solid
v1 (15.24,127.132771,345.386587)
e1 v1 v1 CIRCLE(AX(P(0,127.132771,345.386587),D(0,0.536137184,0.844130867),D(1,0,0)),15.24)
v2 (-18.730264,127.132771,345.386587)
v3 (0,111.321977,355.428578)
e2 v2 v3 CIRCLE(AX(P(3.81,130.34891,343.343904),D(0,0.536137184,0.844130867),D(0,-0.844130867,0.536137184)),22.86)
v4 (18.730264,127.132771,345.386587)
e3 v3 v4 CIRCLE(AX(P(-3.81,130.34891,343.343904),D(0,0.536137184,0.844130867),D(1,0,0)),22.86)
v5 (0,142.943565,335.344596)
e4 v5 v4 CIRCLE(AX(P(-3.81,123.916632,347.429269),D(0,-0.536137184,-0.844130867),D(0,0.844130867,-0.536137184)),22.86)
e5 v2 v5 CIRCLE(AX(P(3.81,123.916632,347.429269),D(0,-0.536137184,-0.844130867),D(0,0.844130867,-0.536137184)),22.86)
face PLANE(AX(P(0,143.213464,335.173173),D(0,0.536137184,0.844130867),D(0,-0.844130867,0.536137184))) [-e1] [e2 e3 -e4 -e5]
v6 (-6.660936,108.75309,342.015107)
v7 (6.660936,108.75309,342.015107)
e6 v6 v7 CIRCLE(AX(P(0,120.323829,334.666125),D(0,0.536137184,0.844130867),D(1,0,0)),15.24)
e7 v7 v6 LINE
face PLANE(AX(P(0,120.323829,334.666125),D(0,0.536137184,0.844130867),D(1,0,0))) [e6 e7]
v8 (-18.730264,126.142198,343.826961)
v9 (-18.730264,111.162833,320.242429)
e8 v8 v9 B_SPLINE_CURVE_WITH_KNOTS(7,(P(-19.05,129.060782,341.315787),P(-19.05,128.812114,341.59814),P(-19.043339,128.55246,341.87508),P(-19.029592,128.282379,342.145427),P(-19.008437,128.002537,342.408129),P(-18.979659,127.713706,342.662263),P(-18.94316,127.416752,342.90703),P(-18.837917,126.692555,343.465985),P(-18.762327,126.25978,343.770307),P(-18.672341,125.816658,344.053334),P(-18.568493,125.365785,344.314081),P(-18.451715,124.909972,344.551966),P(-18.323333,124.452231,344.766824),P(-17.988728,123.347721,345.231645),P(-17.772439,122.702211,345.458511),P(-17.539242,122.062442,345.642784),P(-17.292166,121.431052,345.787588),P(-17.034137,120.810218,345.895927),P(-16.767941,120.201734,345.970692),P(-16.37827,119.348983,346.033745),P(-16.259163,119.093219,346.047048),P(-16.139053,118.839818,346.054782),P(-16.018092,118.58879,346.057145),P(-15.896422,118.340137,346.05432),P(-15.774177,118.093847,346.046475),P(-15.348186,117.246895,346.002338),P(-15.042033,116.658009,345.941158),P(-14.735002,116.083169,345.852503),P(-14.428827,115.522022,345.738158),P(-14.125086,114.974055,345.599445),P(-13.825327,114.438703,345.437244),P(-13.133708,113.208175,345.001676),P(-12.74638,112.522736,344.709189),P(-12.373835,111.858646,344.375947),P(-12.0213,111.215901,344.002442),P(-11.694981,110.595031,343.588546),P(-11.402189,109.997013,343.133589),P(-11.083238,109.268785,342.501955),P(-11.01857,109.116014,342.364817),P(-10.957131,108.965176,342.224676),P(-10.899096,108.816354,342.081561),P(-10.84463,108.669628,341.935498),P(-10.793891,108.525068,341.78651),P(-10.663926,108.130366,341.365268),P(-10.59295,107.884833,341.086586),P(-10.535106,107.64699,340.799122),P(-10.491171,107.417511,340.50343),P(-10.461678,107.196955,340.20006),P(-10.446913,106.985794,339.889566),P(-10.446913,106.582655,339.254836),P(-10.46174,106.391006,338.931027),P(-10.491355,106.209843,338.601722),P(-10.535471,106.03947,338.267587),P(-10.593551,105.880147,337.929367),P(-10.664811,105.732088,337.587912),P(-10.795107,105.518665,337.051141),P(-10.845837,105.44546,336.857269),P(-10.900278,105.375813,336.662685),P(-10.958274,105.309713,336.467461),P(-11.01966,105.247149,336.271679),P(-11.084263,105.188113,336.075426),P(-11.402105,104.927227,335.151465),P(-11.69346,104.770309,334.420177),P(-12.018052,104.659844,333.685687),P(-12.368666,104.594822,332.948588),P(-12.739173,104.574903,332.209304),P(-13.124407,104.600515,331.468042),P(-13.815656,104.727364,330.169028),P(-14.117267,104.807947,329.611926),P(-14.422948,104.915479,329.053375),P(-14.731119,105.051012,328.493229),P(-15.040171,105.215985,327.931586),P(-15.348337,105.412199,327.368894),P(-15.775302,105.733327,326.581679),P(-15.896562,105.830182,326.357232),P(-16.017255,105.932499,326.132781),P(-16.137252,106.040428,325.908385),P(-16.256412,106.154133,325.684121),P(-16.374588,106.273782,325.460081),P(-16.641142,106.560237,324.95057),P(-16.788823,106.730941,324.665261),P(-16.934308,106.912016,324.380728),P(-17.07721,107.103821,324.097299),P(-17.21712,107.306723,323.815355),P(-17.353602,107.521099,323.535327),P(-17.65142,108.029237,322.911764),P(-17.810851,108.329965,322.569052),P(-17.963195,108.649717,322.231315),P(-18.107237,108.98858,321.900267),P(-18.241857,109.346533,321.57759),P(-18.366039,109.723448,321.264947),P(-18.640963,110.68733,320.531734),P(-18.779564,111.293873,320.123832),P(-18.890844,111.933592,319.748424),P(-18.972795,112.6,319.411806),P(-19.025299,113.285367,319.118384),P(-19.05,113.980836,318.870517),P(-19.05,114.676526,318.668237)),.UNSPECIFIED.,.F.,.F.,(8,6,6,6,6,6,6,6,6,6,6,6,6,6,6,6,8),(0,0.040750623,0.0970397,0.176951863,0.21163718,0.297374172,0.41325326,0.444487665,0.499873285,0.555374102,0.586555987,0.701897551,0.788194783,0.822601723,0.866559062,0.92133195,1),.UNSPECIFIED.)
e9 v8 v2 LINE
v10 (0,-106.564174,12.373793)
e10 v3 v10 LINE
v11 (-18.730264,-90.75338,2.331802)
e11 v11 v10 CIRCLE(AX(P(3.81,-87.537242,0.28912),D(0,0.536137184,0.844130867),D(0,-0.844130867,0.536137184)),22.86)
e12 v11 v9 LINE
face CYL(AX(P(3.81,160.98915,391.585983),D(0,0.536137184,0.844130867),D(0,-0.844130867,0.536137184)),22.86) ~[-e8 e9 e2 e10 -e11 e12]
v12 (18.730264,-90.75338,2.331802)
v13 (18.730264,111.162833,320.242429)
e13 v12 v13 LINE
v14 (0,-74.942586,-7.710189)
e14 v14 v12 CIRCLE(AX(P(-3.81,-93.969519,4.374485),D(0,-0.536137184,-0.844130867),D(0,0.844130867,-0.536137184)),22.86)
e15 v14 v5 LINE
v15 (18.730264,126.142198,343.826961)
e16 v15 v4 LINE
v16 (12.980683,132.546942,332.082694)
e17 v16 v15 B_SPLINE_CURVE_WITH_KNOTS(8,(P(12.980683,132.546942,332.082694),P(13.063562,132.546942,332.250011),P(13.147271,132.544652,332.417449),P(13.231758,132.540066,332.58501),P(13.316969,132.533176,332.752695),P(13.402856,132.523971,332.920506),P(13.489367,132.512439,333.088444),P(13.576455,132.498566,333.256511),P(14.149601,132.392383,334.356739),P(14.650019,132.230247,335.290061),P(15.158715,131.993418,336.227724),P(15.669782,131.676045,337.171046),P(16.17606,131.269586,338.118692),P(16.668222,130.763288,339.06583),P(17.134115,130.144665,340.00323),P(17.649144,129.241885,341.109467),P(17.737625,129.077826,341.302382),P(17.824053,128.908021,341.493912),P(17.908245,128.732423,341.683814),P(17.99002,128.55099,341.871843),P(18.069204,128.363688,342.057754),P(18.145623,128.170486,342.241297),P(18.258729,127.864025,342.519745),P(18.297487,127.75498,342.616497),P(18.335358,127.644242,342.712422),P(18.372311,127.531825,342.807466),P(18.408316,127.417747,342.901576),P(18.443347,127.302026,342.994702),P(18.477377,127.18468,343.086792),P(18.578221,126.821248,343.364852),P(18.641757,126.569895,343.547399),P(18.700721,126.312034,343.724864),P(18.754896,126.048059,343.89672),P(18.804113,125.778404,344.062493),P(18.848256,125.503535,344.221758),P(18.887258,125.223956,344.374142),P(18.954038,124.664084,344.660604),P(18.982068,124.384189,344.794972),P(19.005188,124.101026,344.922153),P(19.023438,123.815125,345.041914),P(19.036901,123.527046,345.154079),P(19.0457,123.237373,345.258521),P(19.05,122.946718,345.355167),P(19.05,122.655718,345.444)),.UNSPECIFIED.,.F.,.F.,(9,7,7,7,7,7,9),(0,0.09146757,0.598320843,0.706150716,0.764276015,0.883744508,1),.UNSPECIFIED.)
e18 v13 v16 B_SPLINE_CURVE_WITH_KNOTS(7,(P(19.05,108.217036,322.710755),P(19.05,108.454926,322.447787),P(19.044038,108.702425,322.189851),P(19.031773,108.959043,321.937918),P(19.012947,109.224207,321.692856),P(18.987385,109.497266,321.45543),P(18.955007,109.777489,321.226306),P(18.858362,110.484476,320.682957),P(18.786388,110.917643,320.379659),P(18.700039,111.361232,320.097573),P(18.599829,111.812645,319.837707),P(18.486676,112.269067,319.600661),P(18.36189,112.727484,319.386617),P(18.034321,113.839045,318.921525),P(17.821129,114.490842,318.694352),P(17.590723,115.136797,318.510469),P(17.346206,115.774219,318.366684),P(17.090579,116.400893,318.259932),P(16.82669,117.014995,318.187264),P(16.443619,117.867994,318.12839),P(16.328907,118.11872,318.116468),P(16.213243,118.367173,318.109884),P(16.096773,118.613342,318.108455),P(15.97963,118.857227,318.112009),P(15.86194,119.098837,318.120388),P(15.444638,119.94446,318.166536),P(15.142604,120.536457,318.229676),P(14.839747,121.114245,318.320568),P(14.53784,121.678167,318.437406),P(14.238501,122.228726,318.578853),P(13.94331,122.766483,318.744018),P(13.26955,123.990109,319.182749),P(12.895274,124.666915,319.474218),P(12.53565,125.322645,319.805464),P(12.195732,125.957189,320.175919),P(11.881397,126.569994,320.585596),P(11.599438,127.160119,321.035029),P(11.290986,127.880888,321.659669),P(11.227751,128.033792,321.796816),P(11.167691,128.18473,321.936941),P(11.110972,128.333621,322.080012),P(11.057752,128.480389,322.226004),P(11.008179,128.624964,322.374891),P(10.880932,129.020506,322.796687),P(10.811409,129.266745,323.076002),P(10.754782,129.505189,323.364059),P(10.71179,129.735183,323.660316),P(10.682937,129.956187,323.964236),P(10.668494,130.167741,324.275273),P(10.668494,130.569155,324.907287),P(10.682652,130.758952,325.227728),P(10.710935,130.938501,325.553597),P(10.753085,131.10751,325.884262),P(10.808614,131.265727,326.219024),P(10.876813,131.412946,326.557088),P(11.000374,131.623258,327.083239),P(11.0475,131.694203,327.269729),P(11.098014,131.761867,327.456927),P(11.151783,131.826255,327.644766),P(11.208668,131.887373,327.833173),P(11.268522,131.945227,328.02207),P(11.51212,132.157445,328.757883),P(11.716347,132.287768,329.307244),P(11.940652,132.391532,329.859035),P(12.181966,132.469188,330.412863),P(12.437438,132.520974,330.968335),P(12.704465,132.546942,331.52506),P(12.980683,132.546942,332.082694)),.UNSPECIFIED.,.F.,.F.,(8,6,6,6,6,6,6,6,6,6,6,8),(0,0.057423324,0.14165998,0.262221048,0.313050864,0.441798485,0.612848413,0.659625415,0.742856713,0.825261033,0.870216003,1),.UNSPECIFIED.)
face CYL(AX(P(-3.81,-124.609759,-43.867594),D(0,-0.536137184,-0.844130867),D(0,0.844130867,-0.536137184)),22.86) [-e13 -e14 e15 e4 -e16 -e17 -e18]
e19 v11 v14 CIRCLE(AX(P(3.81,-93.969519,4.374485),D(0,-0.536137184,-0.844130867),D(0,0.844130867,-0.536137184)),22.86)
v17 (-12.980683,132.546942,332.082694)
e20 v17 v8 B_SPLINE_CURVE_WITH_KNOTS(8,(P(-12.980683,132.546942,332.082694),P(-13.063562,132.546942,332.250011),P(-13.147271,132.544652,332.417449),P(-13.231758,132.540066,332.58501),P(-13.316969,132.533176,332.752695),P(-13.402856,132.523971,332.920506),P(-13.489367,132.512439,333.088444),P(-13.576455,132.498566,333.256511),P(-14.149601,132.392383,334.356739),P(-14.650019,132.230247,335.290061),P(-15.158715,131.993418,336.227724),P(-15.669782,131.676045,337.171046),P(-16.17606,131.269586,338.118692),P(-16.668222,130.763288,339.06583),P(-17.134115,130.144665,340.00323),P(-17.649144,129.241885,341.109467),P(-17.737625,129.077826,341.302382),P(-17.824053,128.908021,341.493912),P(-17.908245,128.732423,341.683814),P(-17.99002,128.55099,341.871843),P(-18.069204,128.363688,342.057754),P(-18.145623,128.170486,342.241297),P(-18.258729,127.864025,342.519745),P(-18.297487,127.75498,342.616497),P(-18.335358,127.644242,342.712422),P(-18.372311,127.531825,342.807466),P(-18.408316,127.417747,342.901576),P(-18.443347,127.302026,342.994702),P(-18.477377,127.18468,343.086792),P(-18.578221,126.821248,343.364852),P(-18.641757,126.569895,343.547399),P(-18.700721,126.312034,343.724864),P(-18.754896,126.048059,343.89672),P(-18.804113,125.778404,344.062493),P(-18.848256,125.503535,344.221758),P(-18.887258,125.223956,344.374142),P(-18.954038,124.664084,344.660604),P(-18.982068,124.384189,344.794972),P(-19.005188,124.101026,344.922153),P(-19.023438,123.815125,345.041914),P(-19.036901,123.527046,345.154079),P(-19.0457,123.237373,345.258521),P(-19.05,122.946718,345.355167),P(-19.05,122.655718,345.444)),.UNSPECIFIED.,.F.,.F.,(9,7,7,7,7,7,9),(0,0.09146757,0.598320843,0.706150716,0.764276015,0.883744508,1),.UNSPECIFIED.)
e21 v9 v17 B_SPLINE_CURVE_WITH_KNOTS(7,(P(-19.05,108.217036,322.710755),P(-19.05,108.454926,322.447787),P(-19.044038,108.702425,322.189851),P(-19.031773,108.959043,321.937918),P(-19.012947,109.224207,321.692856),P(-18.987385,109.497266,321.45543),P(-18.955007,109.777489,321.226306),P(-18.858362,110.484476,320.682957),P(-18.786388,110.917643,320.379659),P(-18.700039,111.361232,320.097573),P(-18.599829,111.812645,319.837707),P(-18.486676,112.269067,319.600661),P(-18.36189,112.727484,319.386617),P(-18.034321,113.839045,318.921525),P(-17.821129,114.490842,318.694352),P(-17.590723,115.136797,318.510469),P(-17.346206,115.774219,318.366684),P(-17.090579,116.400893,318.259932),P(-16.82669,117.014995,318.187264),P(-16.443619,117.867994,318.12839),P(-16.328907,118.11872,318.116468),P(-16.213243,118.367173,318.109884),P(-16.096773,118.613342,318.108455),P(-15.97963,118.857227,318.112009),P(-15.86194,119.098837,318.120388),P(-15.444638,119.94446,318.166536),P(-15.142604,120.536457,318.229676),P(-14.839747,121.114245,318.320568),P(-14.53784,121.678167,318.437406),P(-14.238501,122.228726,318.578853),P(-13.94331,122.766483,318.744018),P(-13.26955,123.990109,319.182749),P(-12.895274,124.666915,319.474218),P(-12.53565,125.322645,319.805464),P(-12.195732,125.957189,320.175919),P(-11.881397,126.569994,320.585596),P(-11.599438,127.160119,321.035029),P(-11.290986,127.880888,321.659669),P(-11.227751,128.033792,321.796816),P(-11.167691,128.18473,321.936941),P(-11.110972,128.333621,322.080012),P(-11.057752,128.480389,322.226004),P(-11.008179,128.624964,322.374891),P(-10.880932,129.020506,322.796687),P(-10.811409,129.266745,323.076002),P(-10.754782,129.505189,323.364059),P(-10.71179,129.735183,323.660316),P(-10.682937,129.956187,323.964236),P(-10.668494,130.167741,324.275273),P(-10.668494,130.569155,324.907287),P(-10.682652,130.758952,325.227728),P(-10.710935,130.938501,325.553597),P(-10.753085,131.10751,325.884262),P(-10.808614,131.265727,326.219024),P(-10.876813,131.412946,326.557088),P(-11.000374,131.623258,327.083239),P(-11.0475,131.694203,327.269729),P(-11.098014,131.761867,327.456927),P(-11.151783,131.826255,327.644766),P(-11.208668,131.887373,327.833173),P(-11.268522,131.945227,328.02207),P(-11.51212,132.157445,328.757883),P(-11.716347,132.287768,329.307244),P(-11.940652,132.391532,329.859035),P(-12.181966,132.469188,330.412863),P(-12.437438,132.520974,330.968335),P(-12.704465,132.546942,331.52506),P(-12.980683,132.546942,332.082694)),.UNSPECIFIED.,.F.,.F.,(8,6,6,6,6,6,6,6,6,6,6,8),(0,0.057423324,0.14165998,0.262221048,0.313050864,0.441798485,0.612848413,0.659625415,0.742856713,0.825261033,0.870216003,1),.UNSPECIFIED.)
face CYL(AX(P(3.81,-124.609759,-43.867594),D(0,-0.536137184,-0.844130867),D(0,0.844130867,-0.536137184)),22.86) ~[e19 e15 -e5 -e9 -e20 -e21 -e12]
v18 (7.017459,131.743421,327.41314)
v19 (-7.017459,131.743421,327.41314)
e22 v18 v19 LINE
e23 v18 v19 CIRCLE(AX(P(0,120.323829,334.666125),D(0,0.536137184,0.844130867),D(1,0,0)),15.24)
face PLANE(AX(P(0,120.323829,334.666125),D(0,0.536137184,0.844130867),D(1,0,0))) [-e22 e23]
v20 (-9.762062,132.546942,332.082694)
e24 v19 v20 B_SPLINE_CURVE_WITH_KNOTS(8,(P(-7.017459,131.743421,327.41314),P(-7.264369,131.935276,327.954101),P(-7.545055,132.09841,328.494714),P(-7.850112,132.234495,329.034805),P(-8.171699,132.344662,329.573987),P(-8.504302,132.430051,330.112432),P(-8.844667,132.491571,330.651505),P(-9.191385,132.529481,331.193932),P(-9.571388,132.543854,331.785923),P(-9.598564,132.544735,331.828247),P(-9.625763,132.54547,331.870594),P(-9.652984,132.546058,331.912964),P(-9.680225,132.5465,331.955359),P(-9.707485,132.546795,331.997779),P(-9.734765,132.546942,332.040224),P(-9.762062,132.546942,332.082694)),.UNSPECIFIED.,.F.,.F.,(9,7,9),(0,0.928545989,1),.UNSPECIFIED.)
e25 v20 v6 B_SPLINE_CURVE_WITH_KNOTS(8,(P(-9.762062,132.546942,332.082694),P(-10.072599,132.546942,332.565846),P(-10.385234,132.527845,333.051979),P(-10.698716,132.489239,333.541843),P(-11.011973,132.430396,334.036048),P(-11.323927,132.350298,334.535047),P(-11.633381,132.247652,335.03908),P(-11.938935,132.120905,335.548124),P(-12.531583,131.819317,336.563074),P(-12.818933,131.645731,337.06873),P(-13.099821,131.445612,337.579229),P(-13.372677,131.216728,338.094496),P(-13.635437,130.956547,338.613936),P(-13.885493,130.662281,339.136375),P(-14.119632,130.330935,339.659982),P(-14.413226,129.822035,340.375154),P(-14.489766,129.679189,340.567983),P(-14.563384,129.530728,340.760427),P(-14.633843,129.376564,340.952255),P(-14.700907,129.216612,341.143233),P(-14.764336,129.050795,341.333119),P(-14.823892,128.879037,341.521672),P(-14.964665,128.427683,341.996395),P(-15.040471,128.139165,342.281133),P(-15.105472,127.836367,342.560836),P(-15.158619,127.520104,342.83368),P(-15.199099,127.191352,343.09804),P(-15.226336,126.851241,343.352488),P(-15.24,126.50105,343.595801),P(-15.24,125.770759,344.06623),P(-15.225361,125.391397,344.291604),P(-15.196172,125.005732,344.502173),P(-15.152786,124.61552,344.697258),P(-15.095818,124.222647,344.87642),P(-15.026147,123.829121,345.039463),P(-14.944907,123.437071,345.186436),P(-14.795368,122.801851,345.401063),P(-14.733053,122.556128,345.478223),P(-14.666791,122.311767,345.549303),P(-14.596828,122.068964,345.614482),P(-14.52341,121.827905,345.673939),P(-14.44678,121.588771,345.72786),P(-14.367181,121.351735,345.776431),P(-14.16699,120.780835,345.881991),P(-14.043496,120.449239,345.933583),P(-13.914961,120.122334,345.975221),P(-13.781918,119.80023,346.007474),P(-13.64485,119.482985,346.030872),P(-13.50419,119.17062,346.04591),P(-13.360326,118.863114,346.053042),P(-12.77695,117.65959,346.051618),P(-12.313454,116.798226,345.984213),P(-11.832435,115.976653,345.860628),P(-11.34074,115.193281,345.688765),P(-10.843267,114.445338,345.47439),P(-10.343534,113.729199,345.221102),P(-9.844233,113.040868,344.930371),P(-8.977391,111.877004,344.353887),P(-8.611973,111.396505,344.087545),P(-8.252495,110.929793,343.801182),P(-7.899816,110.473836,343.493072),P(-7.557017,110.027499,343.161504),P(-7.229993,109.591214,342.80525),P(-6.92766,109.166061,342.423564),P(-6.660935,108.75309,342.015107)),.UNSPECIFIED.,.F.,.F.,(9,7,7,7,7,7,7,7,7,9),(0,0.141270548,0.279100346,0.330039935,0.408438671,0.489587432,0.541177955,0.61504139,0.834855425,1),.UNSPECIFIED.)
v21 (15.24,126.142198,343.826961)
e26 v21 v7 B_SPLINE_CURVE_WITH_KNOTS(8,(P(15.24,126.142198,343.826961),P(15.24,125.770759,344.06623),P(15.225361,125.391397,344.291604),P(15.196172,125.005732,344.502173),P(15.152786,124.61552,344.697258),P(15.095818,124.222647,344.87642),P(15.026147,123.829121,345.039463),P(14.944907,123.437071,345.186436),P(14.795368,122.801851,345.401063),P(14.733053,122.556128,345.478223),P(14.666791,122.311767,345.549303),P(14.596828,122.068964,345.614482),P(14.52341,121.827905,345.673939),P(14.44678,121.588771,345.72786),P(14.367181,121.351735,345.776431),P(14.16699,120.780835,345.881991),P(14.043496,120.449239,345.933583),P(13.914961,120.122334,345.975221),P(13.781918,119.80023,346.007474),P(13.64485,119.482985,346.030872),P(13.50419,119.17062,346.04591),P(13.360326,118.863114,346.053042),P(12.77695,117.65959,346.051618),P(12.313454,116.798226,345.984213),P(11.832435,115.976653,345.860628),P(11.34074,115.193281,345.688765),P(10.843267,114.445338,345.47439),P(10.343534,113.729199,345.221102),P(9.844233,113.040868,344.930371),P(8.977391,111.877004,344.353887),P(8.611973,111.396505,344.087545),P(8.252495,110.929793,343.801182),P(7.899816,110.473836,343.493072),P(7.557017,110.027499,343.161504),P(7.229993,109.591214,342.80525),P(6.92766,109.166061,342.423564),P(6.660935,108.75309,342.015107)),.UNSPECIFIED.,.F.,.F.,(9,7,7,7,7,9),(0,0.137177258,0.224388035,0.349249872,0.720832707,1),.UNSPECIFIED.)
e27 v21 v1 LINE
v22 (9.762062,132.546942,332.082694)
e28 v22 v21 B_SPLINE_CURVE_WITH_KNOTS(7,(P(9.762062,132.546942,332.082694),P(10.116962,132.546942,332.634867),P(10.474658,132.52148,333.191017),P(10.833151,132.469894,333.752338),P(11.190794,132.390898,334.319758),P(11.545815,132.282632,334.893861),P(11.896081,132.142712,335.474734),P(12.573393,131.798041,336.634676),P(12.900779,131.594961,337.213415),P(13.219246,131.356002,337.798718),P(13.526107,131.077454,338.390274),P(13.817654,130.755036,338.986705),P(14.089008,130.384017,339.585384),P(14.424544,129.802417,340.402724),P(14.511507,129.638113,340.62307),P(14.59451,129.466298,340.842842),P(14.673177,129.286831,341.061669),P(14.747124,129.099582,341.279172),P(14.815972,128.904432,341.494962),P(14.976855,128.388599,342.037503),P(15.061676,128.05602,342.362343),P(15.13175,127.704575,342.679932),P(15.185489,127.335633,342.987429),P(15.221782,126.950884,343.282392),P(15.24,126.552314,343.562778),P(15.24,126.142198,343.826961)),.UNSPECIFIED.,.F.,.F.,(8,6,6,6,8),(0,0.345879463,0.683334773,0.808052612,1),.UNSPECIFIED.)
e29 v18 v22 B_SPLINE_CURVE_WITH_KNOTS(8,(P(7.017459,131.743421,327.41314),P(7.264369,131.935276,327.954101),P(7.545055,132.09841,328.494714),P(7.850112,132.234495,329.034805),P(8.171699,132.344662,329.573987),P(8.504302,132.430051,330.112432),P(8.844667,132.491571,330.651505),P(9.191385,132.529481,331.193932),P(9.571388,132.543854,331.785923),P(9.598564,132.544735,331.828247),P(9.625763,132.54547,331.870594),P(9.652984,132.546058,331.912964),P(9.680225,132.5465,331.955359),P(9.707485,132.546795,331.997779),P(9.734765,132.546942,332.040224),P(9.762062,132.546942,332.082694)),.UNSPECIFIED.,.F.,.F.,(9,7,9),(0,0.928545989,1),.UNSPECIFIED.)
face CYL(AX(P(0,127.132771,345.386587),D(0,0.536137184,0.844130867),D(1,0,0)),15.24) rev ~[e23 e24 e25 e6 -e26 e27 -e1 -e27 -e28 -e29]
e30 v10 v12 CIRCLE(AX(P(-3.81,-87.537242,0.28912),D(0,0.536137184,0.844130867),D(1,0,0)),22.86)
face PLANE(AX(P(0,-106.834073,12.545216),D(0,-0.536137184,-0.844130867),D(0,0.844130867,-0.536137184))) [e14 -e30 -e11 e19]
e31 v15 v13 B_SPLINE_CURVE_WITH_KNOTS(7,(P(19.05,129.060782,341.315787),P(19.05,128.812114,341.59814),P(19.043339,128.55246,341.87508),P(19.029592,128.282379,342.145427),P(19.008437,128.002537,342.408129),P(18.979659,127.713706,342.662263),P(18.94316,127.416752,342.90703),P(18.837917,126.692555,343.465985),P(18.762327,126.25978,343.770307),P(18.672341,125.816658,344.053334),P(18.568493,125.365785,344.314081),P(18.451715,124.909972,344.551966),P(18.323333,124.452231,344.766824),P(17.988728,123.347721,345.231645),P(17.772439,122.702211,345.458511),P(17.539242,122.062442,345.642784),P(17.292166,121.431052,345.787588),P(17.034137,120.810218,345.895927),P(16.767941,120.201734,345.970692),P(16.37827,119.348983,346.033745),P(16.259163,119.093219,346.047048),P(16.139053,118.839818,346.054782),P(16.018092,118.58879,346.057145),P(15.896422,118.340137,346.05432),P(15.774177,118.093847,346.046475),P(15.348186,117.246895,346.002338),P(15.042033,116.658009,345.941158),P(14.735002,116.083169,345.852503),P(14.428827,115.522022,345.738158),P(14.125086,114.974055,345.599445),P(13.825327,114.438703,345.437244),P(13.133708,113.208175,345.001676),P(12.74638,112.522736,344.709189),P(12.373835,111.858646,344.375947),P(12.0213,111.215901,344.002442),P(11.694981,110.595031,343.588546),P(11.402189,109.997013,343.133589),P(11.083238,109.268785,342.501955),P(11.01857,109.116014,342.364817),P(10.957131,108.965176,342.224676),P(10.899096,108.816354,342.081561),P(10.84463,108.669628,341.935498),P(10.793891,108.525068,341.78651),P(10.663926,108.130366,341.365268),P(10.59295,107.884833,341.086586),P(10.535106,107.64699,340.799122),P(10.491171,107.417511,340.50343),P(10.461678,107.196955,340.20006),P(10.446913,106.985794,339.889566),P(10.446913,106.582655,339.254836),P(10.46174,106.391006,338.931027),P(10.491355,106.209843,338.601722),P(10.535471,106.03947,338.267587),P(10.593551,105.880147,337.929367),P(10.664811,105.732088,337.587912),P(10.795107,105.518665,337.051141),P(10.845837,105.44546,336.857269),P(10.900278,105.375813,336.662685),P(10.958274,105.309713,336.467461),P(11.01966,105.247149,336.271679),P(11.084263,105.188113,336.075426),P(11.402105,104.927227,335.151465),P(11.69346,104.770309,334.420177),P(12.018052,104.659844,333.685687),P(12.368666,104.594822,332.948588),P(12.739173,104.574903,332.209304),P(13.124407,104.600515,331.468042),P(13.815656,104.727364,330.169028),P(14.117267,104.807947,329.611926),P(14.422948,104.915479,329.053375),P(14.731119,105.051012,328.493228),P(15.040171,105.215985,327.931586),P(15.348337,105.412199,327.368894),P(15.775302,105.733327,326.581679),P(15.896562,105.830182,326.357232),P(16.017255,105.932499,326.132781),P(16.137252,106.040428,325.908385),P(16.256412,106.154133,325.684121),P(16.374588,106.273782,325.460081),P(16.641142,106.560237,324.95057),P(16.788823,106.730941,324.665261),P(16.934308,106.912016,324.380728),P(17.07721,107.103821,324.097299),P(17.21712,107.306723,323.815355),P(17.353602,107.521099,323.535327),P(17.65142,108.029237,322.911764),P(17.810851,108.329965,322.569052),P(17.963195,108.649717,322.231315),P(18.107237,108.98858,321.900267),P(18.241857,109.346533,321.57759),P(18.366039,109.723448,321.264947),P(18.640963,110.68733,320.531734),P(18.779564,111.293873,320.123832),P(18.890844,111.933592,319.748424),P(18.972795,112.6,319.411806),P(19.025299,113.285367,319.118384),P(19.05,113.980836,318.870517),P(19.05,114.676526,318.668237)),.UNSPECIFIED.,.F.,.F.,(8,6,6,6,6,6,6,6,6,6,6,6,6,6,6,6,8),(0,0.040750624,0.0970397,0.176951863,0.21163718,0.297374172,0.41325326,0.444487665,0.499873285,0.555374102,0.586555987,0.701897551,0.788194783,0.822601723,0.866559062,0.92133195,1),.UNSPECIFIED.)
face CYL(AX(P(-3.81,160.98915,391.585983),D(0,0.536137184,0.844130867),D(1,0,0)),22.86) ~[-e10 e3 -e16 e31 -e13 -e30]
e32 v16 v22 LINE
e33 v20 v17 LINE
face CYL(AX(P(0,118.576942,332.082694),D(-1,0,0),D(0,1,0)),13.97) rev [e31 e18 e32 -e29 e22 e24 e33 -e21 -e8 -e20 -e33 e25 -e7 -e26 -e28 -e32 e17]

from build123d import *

# Parameters (mm, degrees)
F0_R        = 13.97
F1_DEPTH    = 19.05
F2_T1_DEPTH = 520.7
F2_T3_DEPTH = 520.7
F3_R        = 15.24
F4_DEPTH    = 12.7


# Not quite as in the source:
# - a fillet or chamfer that OpenCascade refuses, or shapes differently, is made with other operations: its cross-section is extruded or revolved along the edge and cut away or added


with BuildPart() as f1:
    # F0 (on Right) → F1 (new body, symmetric)
    with BuildSketch(Plane.YZ):
        Polygon((143.2134641072, 335.1731732972), (111.0520780853, 355.6), (-106.8340734116, 12.545215766), (-74.6726873897, -7.8816109369), align=None)
        with Locations((118.576942247, 332.0826940597)):
            Circle(F0_R, mode=Mode.SUBTRACT)
    extrude(amount=F1_DEPTH, both=True)

    # F2: fillet of radius 22.86 on 4 edges, made by hand

    # F2_s2 → F2_t1 (cut)
    with BuildSketch(Plane(origin=(0, 223.4952640736, 351.8861527791), x_dir=(1, 0, 0), z_dir=(0, -0.5361371838, -0.8441308667))):
        with BuildLine():
            ThreePointArc((19.05, 74.0478956349), (12.3544610179, 90.2123566528), (-3.81, 96.9078956349))
            Line((-3.81, 96.9078956349), (19.05, 96.9078956349))
            Line((19.05, 96.9078956349), (19.05, 74.0478956349))
        make_face()
        with BuildLine():
            ThreePointArc((3.81, 96.9078956349), (-12.3544610179, 90.2123566528), (-19.05, 74.0478956349))
            Line((-19.05, 74.0478956349), (-19.05, 96.9078956349))
            Line((-19.05, 96.9078956349), (3.81, 96.9078956349))
        make_face()
    extrude(amount=F2_T1_DEPTH, mode=Mode.SUBTRACT)

    # F2_s4 → F2_t3 (cut)
    with BuildSketch(Plane(origin=(0, -55.6713675318, -87.6527895208), x_dir=(1, 0, 0), z_dir=(0, 0.5361371838, 0.8441308667))):
        with BuildLine():
            ThreePointArc((-3.81, -58.8078956349), (12.3544610179, -65.5034346169), (19.05, -81.6678956349))
            Line((19.05, -81.6678956349), (19.05, -58.8078956349))
            Line((19.05, -58.8078956349), (-3.81, -58.8078956349))
        make_face()
        with BuildLine():
            ThreePointArc((3.81, -58.8078956349), (-12.3544610179, -65.5034346169), (-19.05, -81.6678956349))
            Line((-19.05, -81.6678956349), (-19.05, -58.8078956349))
            Line((-19.05, -58.8078956349), (3.81, -58.8078956349))
        make_face()
    extrude(amount=F2_T3_DEPTH, mode=Mode.SUBTRACT)

    # F3 (on face) → F4 (cut, symmetric)
    with BuildSketch(Plane(origin=(0, 192.8550240193, 303.6440737462), x_dir=(1, 0, 0), z_dir=(0, 0.5361371838, 0.8441308667))):
        with Locations((0, -77.8578956349)):
            Circle(F3_R)
    extrude(amount=F4_DEPTH, both=True, mode=Mode.SUBTRACT)


solid = f1.part
